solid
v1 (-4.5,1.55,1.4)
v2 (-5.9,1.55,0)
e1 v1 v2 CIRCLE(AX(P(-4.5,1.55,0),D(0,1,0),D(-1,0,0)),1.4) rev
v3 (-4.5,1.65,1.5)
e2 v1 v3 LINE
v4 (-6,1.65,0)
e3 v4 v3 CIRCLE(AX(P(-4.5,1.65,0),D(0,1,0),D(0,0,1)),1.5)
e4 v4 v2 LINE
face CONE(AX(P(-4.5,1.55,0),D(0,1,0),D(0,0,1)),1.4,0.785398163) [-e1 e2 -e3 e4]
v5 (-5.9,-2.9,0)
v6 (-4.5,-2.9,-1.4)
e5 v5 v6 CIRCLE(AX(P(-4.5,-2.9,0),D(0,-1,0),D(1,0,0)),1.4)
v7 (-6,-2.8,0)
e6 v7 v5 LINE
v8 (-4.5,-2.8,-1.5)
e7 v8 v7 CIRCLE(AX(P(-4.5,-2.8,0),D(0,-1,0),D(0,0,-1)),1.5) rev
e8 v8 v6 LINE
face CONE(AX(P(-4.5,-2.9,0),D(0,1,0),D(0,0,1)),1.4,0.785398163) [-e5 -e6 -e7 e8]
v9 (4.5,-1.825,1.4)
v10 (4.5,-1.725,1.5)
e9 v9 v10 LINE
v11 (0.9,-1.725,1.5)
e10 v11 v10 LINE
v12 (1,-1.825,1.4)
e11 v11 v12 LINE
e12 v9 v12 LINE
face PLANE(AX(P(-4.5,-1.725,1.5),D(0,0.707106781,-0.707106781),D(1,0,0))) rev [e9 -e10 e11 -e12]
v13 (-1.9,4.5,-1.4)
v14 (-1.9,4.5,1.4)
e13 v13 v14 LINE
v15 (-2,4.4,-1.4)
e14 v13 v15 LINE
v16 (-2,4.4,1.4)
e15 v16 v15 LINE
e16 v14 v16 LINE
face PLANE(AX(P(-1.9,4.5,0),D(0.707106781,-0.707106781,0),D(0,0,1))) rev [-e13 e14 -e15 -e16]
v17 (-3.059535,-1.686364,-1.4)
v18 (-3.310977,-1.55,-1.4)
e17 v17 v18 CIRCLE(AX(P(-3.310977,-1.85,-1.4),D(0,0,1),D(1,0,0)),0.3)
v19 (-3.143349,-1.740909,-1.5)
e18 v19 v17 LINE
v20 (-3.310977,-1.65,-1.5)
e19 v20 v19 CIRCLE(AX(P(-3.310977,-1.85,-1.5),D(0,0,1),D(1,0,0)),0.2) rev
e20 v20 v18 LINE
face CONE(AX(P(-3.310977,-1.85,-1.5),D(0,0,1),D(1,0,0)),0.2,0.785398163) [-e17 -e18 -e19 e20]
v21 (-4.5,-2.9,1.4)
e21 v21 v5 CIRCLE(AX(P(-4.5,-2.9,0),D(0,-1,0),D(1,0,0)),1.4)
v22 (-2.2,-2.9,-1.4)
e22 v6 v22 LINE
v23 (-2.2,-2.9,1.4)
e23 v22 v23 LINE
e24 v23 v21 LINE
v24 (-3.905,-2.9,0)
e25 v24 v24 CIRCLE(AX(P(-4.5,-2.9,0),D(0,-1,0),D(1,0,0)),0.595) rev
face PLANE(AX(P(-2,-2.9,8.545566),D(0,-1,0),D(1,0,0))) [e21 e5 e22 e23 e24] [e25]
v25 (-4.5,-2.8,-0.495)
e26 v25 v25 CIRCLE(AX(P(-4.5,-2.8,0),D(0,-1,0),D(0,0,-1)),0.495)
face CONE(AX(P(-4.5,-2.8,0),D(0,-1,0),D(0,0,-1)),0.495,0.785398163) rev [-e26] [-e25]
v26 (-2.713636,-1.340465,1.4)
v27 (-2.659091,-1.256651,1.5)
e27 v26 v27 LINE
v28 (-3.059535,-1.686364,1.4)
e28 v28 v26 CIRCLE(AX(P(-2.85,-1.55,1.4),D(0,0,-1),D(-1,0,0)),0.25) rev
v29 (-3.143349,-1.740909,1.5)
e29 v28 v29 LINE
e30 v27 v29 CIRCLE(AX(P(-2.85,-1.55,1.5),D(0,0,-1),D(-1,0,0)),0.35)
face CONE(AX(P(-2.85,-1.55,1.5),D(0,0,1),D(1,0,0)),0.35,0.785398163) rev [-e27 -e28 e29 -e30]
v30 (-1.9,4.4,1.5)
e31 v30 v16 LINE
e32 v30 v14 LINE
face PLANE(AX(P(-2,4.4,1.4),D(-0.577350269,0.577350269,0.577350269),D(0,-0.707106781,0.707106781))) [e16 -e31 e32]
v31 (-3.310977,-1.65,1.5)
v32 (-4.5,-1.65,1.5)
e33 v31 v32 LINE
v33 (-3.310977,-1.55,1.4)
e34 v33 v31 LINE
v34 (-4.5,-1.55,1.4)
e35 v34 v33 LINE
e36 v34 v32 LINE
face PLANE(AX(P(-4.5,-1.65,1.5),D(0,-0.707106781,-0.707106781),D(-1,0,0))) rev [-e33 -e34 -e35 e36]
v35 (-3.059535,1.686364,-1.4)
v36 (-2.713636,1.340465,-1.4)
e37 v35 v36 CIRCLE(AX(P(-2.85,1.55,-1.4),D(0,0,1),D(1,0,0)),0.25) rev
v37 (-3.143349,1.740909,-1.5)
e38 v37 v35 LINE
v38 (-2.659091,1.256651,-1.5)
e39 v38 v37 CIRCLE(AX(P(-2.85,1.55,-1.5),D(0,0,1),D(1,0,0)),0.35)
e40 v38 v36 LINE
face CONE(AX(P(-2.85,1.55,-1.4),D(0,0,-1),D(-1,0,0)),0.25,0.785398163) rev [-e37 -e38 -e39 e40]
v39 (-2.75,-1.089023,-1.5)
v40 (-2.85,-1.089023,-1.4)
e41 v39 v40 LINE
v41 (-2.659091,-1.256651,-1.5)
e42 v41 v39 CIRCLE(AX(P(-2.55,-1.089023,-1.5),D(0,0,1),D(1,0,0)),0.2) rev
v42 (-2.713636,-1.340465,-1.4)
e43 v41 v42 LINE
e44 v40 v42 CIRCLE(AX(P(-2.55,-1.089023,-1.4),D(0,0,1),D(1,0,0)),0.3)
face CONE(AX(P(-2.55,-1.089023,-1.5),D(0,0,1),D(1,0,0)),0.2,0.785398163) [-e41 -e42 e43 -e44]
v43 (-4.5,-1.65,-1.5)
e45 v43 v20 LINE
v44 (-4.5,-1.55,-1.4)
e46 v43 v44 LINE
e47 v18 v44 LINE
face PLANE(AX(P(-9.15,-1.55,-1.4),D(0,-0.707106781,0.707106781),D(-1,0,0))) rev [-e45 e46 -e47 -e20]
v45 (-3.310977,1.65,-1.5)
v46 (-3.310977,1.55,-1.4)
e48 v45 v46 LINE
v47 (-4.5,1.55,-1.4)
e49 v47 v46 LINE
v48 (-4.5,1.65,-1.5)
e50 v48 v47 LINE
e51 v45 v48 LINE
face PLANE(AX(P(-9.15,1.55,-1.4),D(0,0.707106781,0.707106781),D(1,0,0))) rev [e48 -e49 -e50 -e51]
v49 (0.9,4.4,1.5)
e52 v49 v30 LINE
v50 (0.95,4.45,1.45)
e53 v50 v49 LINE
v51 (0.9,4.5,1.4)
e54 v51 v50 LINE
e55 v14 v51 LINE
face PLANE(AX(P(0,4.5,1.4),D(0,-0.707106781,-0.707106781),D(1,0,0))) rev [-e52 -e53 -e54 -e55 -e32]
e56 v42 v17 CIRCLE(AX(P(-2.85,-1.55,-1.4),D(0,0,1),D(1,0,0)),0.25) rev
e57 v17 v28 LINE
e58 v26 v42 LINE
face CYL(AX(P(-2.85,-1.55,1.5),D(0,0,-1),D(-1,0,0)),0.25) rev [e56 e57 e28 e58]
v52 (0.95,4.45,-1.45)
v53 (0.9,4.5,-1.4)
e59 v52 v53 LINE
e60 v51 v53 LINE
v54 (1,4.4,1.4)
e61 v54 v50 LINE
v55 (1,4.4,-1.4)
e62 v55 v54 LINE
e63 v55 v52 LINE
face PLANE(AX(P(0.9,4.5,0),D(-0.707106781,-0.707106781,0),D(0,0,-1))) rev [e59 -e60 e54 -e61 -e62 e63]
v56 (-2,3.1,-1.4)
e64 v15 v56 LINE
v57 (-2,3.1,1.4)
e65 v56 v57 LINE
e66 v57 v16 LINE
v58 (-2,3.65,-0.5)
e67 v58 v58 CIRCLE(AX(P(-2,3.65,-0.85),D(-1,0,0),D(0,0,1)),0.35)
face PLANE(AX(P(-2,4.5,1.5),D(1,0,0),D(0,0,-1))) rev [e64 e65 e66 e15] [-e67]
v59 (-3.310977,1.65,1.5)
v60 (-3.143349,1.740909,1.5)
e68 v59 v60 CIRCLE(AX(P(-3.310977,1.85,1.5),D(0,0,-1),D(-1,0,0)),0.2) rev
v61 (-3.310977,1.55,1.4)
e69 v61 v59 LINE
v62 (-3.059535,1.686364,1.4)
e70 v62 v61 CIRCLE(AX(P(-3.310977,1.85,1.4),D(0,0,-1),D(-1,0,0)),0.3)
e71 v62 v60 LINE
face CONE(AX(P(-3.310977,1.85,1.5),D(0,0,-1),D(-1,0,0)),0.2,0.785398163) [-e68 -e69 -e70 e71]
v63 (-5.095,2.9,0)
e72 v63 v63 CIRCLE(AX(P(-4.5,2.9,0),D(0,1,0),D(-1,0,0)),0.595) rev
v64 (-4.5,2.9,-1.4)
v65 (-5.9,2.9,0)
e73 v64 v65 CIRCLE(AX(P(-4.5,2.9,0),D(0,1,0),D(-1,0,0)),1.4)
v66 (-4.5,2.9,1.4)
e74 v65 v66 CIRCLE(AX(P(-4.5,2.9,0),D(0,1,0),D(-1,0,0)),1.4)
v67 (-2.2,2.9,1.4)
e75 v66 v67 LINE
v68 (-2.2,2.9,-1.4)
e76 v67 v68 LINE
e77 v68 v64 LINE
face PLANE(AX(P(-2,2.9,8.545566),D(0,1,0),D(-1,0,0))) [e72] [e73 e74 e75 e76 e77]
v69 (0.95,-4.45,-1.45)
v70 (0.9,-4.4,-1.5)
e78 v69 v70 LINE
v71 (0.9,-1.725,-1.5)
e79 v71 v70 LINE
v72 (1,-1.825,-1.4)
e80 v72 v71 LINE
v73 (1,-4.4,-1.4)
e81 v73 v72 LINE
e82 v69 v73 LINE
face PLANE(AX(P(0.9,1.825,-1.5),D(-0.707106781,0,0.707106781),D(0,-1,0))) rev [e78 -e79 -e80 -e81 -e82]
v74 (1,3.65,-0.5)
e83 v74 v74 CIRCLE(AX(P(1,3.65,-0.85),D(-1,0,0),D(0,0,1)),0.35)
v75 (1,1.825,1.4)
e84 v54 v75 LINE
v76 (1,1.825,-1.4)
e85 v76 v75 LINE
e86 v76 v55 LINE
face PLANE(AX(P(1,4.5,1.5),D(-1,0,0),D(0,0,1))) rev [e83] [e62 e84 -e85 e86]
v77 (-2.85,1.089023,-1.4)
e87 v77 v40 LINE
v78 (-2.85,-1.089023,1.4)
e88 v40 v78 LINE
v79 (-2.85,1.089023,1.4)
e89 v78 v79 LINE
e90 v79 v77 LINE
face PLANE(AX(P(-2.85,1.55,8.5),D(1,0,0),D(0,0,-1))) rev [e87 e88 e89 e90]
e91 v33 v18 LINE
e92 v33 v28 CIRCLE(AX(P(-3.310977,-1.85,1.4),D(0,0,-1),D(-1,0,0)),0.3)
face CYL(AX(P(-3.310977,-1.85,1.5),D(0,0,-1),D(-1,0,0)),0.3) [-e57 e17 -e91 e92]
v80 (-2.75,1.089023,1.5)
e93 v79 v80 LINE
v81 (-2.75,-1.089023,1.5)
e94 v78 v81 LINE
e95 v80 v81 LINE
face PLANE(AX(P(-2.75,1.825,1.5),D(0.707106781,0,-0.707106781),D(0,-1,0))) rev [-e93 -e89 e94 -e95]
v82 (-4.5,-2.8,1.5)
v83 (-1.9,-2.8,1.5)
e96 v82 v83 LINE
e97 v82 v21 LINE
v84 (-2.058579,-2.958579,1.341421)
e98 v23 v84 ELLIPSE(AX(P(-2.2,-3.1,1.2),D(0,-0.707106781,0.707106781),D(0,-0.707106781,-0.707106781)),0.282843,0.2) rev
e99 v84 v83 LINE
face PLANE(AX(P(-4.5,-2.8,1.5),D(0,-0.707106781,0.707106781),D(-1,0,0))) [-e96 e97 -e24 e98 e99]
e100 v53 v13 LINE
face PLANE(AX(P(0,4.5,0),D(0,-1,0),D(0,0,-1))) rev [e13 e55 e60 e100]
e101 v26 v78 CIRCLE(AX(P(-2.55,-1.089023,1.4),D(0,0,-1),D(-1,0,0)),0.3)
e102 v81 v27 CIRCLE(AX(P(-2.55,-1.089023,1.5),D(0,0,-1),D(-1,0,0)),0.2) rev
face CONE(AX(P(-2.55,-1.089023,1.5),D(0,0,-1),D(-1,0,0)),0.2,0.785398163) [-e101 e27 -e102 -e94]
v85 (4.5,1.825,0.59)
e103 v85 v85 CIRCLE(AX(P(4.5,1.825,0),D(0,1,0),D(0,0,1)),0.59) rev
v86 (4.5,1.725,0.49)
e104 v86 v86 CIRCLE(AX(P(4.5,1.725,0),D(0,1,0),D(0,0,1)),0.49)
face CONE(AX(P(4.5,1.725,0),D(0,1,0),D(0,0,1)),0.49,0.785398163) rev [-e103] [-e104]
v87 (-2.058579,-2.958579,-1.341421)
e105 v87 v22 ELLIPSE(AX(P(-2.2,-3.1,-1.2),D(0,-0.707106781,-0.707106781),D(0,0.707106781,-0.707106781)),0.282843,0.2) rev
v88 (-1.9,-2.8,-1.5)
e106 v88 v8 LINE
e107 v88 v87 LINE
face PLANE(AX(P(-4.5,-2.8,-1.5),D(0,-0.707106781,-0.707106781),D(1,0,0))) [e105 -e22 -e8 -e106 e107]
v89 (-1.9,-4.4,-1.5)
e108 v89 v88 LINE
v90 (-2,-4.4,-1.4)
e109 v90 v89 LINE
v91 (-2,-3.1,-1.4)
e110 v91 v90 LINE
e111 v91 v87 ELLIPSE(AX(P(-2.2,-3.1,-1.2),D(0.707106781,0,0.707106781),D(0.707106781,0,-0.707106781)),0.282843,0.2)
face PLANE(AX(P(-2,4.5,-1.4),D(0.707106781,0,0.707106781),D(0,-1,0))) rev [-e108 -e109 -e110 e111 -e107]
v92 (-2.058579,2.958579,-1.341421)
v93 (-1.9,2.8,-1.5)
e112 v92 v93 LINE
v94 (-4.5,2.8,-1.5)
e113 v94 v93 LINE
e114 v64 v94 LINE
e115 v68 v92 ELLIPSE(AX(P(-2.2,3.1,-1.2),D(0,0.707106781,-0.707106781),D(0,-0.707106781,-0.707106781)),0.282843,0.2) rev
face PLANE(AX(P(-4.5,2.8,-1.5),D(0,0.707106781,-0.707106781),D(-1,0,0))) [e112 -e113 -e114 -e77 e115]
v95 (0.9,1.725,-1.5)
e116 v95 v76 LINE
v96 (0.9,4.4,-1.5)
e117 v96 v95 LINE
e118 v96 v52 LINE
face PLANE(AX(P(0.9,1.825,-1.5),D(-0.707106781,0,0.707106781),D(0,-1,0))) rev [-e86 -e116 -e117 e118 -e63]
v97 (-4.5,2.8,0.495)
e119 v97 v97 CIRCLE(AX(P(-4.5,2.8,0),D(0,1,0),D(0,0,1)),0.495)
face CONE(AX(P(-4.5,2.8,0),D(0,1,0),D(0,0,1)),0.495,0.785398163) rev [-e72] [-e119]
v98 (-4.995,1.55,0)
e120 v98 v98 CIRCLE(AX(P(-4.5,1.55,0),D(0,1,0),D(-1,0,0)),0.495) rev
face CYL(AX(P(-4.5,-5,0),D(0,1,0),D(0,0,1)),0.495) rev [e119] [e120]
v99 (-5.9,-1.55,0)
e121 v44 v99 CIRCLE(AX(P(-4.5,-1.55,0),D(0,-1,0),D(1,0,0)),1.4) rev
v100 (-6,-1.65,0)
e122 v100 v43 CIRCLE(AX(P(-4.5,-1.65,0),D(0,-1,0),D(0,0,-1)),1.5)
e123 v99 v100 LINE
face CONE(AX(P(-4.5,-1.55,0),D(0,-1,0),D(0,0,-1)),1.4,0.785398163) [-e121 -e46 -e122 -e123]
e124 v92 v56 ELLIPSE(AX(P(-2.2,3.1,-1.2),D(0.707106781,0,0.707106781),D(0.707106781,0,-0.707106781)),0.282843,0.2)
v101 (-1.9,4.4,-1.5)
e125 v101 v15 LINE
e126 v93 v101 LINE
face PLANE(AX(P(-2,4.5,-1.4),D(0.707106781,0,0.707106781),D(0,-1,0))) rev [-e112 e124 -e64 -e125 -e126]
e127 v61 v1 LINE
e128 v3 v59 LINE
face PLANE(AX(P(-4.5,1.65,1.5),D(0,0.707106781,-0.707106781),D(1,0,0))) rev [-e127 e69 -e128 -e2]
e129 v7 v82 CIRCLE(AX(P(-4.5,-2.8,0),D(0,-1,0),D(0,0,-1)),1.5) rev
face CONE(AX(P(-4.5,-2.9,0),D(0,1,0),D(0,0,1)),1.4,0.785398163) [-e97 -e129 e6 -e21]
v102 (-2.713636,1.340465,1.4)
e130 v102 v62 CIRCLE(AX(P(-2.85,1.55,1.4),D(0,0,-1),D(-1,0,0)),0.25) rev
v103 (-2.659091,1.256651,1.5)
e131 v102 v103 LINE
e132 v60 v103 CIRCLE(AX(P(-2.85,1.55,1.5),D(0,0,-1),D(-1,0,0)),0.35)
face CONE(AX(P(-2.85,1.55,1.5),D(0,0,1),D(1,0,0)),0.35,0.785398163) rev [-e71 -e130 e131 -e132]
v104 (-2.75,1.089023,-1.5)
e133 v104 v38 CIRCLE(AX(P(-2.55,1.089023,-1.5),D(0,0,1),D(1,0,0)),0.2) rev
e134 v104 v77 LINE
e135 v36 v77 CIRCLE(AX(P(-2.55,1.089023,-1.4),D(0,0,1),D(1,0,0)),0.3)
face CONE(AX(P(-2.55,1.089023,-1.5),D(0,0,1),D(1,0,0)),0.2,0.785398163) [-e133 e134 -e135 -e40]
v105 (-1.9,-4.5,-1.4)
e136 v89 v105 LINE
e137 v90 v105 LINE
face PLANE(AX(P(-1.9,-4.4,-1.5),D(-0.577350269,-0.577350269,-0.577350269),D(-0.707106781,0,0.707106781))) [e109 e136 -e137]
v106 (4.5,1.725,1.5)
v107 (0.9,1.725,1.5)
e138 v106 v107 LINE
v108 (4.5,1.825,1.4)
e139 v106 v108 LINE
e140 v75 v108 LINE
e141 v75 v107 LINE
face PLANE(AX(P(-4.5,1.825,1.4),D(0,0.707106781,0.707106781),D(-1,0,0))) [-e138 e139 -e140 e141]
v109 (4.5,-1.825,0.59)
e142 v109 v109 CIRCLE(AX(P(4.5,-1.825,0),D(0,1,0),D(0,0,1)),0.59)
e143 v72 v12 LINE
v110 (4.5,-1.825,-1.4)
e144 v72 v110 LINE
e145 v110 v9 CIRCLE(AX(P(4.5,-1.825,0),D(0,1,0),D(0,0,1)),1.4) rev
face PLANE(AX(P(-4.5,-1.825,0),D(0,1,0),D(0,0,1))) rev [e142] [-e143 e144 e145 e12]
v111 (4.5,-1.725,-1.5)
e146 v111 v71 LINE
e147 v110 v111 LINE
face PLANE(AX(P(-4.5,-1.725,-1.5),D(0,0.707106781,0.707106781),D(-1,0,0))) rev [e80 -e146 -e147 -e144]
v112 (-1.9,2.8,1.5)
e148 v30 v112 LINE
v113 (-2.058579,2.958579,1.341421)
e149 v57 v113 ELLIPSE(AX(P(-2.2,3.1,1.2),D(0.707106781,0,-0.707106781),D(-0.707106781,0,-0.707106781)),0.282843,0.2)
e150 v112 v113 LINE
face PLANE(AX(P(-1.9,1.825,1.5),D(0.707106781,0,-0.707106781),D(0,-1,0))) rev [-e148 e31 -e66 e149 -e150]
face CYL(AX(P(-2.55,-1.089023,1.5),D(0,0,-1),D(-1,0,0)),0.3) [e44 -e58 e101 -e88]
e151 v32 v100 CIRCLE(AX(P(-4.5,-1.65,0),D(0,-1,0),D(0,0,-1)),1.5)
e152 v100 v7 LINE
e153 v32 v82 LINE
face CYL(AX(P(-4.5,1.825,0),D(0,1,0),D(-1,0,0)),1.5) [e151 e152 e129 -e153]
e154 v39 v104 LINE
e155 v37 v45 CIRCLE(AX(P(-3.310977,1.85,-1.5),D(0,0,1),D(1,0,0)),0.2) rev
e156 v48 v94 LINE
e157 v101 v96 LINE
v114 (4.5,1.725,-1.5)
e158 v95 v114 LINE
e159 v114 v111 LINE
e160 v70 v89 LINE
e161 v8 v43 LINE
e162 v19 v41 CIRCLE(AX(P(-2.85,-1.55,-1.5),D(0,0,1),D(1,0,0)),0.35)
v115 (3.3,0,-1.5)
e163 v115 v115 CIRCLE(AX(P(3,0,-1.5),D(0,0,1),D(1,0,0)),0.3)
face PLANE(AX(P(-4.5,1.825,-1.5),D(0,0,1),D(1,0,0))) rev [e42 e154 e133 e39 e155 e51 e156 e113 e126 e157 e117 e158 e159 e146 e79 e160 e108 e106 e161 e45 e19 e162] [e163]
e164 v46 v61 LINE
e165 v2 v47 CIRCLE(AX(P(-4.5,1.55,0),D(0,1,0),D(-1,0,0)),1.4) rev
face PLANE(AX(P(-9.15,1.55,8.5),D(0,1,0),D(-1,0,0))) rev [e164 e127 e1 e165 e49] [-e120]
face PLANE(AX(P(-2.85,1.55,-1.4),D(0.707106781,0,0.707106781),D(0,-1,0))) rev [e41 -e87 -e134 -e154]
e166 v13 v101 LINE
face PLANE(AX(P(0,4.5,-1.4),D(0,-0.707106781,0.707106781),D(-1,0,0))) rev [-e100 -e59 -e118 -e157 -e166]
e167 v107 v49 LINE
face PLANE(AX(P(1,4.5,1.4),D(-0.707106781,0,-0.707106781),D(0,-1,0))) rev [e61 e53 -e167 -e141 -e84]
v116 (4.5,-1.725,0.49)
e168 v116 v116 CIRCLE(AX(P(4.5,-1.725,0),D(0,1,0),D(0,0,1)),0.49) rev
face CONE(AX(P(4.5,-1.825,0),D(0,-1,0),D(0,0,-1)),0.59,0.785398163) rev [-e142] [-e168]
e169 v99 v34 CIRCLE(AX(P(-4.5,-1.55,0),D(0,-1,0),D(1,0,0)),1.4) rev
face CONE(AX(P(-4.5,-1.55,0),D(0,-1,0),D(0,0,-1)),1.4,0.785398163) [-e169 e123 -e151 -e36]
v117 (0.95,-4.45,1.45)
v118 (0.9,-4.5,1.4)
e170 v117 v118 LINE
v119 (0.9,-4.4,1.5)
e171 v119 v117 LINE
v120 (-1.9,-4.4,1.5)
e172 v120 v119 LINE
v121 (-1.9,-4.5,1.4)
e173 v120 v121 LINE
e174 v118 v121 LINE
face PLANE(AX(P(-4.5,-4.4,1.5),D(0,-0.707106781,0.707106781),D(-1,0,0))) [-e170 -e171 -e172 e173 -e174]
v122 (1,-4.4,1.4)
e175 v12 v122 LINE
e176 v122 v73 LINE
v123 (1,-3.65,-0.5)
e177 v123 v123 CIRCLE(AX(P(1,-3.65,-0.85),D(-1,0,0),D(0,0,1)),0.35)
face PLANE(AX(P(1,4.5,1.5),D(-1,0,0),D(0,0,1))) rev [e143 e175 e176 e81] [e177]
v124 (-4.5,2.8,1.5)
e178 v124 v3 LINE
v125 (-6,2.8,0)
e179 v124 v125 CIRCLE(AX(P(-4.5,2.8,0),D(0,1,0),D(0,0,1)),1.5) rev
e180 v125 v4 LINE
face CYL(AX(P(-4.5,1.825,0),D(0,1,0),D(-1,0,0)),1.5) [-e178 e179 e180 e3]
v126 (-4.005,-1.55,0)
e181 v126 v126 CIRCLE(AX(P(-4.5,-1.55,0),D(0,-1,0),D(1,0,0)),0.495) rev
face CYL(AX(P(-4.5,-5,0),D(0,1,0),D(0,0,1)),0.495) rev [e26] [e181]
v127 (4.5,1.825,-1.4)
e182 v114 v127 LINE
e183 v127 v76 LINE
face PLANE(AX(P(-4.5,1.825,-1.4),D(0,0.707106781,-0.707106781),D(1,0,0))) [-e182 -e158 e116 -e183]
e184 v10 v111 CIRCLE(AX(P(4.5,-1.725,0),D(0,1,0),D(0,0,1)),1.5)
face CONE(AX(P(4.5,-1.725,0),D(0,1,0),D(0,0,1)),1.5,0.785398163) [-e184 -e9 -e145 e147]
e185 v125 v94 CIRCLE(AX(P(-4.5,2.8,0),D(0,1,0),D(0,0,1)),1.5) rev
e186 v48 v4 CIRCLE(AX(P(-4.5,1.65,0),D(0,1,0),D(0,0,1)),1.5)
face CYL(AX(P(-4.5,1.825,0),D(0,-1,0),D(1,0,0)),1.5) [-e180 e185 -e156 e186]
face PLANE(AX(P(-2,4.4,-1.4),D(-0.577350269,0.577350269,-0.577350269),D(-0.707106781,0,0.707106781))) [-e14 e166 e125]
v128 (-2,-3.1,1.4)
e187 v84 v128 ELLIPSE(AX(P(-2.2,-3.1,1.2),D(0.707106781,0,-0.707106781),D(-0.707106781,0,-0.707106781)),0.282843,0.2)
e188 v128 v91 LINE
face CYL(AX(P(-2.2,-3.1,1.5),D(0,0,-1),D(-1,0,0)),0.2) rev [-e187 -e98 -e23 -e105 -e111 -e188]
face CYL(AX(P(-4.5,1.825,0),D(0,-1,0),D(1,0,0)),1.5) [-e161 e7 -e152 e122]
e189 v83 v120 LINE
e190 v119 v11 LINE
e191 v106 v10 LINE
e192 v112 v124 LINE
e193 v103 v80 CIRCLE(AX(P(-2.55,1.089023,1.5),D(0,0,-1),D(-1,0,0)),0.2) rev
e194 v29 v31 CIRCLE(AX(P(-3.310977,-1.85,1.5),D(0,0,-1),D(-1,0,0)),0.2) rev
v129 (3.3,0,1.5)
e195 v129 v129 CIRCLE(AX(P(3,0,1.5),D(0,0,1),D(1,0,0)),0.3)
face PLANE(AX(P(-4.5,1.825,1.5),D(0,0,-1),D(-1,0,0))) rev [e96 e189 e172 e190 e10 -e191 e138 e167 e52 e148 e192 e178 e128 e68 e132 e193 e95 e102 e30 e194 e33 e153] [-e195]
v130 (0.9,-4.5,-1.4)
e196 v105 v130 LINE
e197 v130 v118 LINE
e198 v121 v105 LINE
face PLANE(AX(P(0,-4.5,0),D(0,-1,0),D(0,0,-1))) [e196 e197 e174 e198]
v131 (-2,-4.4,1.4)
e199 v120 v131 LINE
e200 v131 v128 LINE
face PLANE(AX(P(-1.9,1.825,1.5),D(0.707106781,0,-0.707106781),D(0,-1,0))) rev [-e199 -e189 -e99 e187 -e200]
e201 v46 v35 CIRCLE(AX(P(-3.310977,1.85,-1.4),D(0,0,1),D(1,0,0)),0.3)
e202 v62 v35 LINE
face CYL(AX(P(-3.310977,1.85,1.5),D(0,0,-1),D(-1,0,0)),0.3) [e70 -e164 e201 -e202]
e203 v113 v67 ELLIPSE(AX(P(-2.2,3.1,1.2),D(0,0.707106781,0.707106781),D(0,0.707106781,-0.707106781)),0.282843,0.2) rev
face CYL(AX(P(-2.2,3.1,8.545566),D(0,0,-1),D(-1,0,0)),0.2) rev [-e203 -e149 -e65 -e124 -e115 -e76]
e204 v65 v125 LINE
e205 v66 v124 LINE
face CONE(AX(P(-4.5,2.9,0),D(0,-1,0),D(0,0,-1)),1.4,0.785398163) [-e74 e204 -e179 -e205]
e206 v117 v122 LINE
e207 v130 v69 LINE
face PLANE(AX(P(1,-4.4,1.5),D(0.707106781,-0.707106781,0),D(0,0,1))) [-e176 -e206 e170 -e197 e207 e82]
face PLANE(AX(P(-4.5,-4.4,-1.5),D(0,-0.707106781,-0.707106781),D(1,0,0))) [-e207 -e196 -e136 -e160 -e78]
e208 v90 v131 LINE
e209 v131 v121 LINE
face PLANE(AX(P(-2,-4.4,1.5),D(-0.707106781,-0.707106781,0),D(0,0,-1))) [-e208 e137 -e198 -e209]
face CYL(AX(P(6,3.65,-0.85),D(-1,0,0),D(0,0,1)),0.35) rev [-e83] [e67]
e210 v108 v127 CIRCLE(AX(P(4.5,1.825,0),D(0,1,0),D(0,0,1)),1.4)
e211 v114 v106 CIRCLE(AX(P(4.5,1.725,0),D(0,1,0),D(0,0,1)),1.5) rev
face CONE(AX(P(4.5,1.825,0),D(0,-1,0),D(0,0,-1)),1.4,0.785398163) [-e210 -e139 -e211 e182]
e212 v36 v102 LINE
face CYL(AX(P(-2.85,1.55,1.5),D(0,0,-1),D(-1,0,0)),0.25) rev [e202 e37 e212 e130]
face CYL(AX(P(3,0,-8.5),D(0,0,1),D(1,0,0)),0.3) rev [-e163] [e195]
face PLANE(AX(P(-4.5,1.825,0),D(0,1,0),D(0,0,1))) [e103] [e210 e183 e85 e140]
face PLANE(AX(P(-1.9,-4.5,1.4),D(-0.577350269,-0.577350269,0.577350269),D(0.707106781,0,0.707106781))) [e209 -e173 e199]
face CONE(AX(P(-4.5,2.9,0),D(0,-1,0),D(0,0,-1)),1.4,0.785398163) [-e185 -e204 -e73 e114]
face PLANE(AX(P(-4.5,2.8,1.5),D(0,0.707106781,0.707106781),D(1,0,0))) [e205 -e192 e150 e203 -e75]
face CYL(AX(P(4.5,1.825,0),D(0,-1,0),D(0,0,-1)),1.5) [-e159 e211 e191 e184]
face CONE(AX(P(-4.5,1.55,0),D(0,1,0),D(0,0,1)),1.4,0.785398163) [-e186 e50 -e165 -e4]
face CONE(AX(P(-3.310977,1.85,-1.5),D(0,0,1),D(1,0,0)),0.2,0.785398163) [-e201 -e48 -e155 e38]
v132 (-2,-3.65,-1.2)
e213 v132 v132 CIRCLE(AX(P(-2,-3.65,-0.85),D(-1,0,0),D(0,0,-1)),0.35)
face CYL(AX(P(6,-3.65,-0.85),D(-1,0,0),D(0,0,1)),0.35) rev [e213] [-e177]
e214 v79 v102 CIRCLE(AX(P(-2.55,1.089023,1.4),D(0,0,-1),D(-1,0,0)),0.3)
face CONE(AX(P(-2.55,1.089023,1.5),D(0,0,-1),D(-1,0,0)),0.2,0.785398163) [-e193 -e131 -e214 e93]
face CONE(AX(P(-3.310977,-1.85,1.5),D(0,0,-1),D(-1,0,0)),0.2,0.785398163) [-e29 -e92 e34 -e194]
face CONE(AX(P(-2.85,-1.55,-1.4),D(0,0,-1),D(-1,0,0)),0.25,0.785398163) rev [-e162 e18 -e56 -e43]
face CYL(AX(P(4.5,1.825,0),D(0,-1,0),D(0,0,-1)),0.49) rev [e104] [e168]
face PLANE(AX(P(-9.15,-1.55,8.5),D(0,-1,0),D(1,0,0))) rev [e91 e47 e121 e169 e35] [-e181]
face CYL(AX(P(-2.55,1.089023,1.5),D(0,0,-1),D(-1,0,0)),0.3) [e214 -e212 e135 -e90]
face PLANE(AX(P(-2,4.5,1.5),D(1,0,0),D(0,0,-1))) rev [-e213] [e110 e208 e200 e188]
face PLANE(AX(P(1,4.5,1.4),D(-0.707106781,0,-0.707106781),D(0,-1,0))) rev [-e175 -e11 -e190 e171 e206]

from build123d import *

# Parameters (mm, degrees)
SKETCH1_R           = 0.495
SKETCH1_R_2         = 0.49
BOSS_EXTRUDE1_DEPTH = 1.825
SKETCH3_W           = 3
SKETCH3_H           = 3
BOSS_EXTRUDE4_DEPTH = 4.5
SKETCH6_W           = 4
SKETCH6_H           = 5.8
BOSS_EXTRUDE5_DEPTH = 3
SKETCH8_R           = 0.495
CUT_EXTRUDE4_DEPTH  = 5
SKETCH7_W           = 6.3
SKETCH7_H           = 3.1
CUT_EXTRUDE3_DEPTH  = 10
SKETCH9_R           = 0.25
CUT_EXTRUDE5_DEPTH  = 9.077747211
SKETCH4_R           = 0.35
CUT_EXTRUDE1_DEPTH  = 10.300537619
SKETCH5_R           = 0.3
CUT_EXTRUDE2_DEPTH  = 10
FILLET3_R           = 0.3
FILLET4_R           = 1.5
CHAMFER1_SIZE       = 0.1
CHAMFER2_SIZE       = 0.1
CHAMFER3_SIZE       = 0.1
CHAMFER4_SIZE       = 0.1
FILLET5_R           = 0.2


# Some blends are built 0.0001 mm under size
with BuildPart() as part:
    # Sketch1 → Boss-Extrude1 (new, symmetric)
    with BuildSketch(Plane(origin=(0, 0, 0), x_dir=(1, 0, 0), z_dir=(0, 1, 0))):
        with BuildLine():
            Line((-4.5, 1.5), (4.5, 1.5))
            ThreePointArc((4.5, 1.5), (6, 0), (4.5, -1.5))
            Line((4.5, -1.5), (-4.5, -1.5))
            ThreePointArc((-4.5, -1.5), (-6, 0), (-4.5, 1.5))
        make_face()
        with Locations(Location((-4.5, 0, 0), (0, 0, 270))):
            Circle(SKETCH1_R, mode=Mode.SUBTRACT)
        with Locations(Location((4.5, 0, 0), (0, 0, 270))):
            Circle(SKETCH1_R_2, mode=Mode.SUBTRACT)
    extrude(amount=BOSS_EXTRUDE1_DEPTH, both=True)

    # Sketch3 → Boss-Extrude4 (add, symmetric)
    with BuildSketch(Plane(origin=(0, 0, 0), x_dir=(1, 0, 0), z_dir=(0, 1, 0))):
        with Locations((-0.5, 0)):
            Rectangle(SKETCH3_W, SKETCH3_H)
    extrude(amount=BOSS_EXTRUDE4_DEPTH, both=True)

    # Sketch6 → Boss-Extrude5 (add)
    with BuildSketch(Plane(origin=(0, 0, -1.5), x_dir=(-1, 0, 0), z_dir=(0, 0, -1))):
        with Locations((4, 0)):
            Rectangle(SKETCH6_W, SKETCH6_H)
    extrude(amount=-BOSS_EXTRUDE5_DEPTH)

    # Sketch8 → Cut-Extrude4 (cut, symmetric)
    with BuildSketch(Plane(origin=(0, 0, 0), x_dir=(1, 0, 0), z_dir=(0, 1, 0))):
        with Locations((-4.5, 0)):
            Circle(SKETCH8_R)
    extrude(amount=CUT_EXTRUDE4_DEPTH, both=True, mode=Mode.SUBTRACT)

    # Sketch7 → Cut-Extrude3 (cut)
    with BuildSketch(Plane(origin=(0, 0, -1.5), x_dir=(-1, 0, 0), z_dir=(0, 0, -1))):
        with Locations((6, 0)):
            Rectangle(SKETCH7_W, SKETCH7_H)
    extrude(amount=-CUT_EXTRUDE3_DEPTH, mode=Mode.SUBTRACT)

    # Sketch9 → Cut-Extrude5 (cut, through all)
    with BuildSketch(Plane(origin=(0, 0, -1.5), x_dir=(-1, 0, 0), z_dir=(0, 0, -1))):
        with Locations((2.85, 1.55)):
            Circle(SKETCH9_R)
        with Locations((2.85, -1.55)):
            Circle(SKETCH9_R)
    extrude(amount=-CUT_EXTRUDE5_DEPTH, mode=Mode.SUBTRACT)

    # Sketch4 → Cut-Extrude1 (cut, through all)
    with BuildSketch(Plane.ZY.offset(2)):
        with Locations((-0.85, 3.65)):
            Circle(SKETCH4_R)
        with Locations((-0.85, -3.65)):
            Circle(SKETCH4_R)
    extrude(amount=-CUT_EXTRUDE1_DEPTH, mode=Mode.SUBTRACT)

    # Sketch5 → Cut-Extrude2 (cut)
    with BuildSketch(Plane.XY.offset(1.5)):
        with Locations((3, 0)):
            Circle(SKETCH5_R)
    extrude(amount=-CUT_EXTRUDE2_DEPTH, mode=Mode.SUBTRACT)

    # Fillet3
    fillet3_edges = [part.edges().sort_by_distance(p)[0] for p in [
        (-3.1, 1.55, 0),
        (-2.85, 1.3, 0),
        (-3.1, -1.55, 0),
        (-2.85, -1.3, 0),
    ]]
    fillet(fillet3_edges, radius=FILLET3_R)

    # Fillet4
    fillet4_edges = [part.edges().sort_by_distance(p)[0] for p in [
        (-6, 2.225, 1.5),
        (-6, 2.225, -1.5),
        (-6, -2.225, 1.5),
        (-6, -2.225, -1.5),
    ]]
    fillet(fillet4_edges, radius=FILLET4_R - 0.0001)  # a hair under: the kernel refuses the full size

    # Chamfer1
    chamfer1_edges = [part.edges().sort_by_distance(p)[0] for p in [
        (4.5, -1.825, -0.49),
        (4.5, 1.825, -0.49),
        (-4.995, -2.9, 0),
        (-4.995, 2.9, 0),
    ]]
    chamfer(chamfer1_edges, length=CHAMFER1_SIZE)

    # Chamfer2
    chamfer2_edges = [part.edges().sort_by_distance(p)[0] for p in [
        (6, 1.825, 0),
        (2.75, 1.825, -1.5),
        (2.75, -1.825, 1.5),
        (2.75, 1.825, 1.5),
        (1, -3.1625, -1.5),
        (1, -3.1625, 1.5),
        (1, -4.5, 0),
        (1, 3.1625, 1.5),
        (1, 3.1625, -1.5),
        (1, 4.5, 0),
        (2.75, -1.825, -1.5),
        (6, -1.825, 0),
    ]]
    chamfer(chamfer2_edges, length=CHAMFER2_SIZE)

    # Chamfer3
    # the kernel refuses this chamfer: 0.1 mm, written as the material it takes off along each edge
    with BuildSketch(Plane(origin=(-4.5001, -1.55, 1.5), x_dir=(0, 0.02749587661058508, -0.9996219169112966), z_dir=(1, 0, 0)), Plane(origin=(-3.310977223, 1.55, 1.5), x_dir=(0, -0.027495876610587243, -0.9996219169112966), z_dir=(-1, 0, 0))) as chamfer3_piece_1:
        Polygon((CHAMFER3_SIZE * 0.999621916911, -CHAMFER3_SIZE * 0.0274958766106), (-CHAMFER3_SIZE * 0.0274958766106, -CHAMFER3_SIZE * 0.999621916911), (0, 0), align=None)
    extrude(amount=1.189122777, mode=Mode.SUBTRACT)
    with BuildSketch(Plane(origin=(-3.310977223, -1.55, -1.5), x_dir=(0, -0.9996219169112966, -0.027495876610587302), z_dir=(-1, 0, 0)), Plane(origin=(-4.5001, 1.55, -1.5), x_dir=(0, 0.9996219169112966, -0.027495876610587302), z_dir=(1, 0, 0))) as chamfer3_piece_2:
        Polygon((CHAMFER3_SIZE * 0.999621916911, CHAMFER3_SIZE * 0.0274958766106), (-CHAMFER3_SIZE * 0.0274958766106, CHAMFER3_SIZE * 0.999621916911), (0, 0), align=None)
    extrude(amount=1.189122777, mode=Mode.SUBTRACT)
    with BuildSketch(Plane(origin=(-2.85, -1.55, -1.5), x_dir=(0.545454545454545, 0.8381404052084447, 0), z_dir=(-0.8381404052084447, 0.545454545454545, 0))) as chamfer3_piece_3:
        Polygon((0.25 + CHAMFER3_SIZE, 0), (0.25, -CHAMFER3_SIZE), (0.25, 0), align=None)
    revolve(axis=Axis((-2.85, -1.55, -1.5), (0, 0, -1)), revolution_arc=203.888537698, mode=Mode.SUBTRACT)
    with BuildSketch(Plane(origin=(-2.85, 1.089022777, -1.5), x_dir=(0.9996219169112966, 0, -0.02749587661058718), z_dir=(0, -1, 0))) as chamfer3_piece_4:
        Polygon((CHAMFER3_SIZE * 0.999621916911, CHAMFER3_SIZE * 0.0274958766106), (-CHAMFER3_SIZE * 0.0274958766106, CHAMFER3_SIZE * 0.999621916911), (0, 0), align=None)
    extrude(amount=2.178045554, mode=Mode.SUBTRACT)
    with BuildSketch(Plane(origin=(-2.85, 1.55, -1.5), x_dir=(-0.8381404052084445, 0.5454545454545454, 0), z_dir=(-0.5454545454545454, -0.8381404052084445, 0))) as chamfer3_piece_5:
        Polygon((0.25 + CHAMFER3_SIZE, 0), (0.25, -CHAMFER3_SIZE), (0.25, 0), align=None)
    revolve(axis=Axis((-2.85, 1.55, -1.5), (0, 0, -1)), revolution_arc=203.888537698, mode=Mode.SUBTRACT)
    with BuildSketch(Plane(origin=(-2.55, 1.089022777, -1.5), x_dir=(-0.5454545454545466, 0.8381404052084436, 0), z_dir=(0.8381404052084436, 0.5454545454545466, 0))) as chamfer3_piece_6:
        Polygon((0.3 - CHAMFER3_SIZE, 0), (0.3, CHAMFER3_SIZE), (0.3, 0), align=None)
    revolve(axis=Axis((-2.55, 1.089022777, -1.5), (0, 0, 1)), revolution_arc=56.944268849, mode=Mode.SUBTRACT)
    with BuildSketch(Plane(origin=(-3.310977223, 1.85, -1.5), x_dir=(0, -1, 0), z_dir=(-1, 0, 0))) as chamfer3_piece_7:
        Polygon((0.3 - CHAMFER3_SIZE, 0), (0.3, CHAMFER3_SIZE), (0.3, 0), align=None)
    revolve(axis=Axis((-3.310977223, 1.85, -1.5), (0, 0, 1)), revolution_arc=56.944268849, mode=Mode.SUBTRACT)
    with BuildSketch(Plane(origin=(-2.55, -1.089022777, -1.5), x_dir=(-1, 0, 0), z_dir=(0, 1, 0))) as chamfer3_piece_8:
        Polygon((0.3 - CHAMFER3_SIZE, 0), (0.3, CHAMFER3_SIZE), (0.3, 0), align=None)
    revolve(axis=Axis((-2.55, -1.089022777, -1.5), (0, 0, 1)), revolution_arc=56.944268849, mode=Mode.SUBTRACT)
    with BuildSketch(Plane(origin=(-3.310977223, -1.85, -1.5), x_dir=(0.8381404052084445, 0.5454545454545453, 0), z_dir=(0.5454545454545453, -0.8381404052084445, 0))) as chamfer3_piece_9:
        Polygon((0.3 - CHAMFER3_SIZE, 0), (0.3, CHAMFER3_SIZE), (0.3, 0), align=None)
    revolve(axis=Axis((-3.310977223, -1.85, -1.5), (0, 0, 1)), revolution_arc=56.944268849, mode=Mode.SUBTRACT)
    with BuildSketch(Plane(origin=(-2.85, -1.55, 1.5), x_dir=(0.545454545454545, 0.8381404052084447, 0), z_dir=(-0.8381404052084447, 0.545454545454545, 0))) as chamfer3_piece_10:
        Polygon((0.25, CHAMFER3_SIZE), (0.25 + CHAMFER3_SIZE, 0), (0.25, 0), align=None)
    revolve(axis=Axis((-2.85, -1.55, 1.5), (0, 0, -1)), revolution_arc=203.888537698, mode=Mode.SUBTRACT)
    with BuildSketch(Plane(origin=(-2.85, -1.089022777, 1.5), x_dir=(-0.027495876610587302, 0, -0.9996219169112966), z_dir=(0, 1, 0))) as chamfer3_piece_11:
        Polygon((CHAMFER3_SIZE * 0.999621916911, -CHAMFER3_SIZE * 0.0274958766106), (-CHAMFER3_SIZE * 0.0274958766106, -CHAMFER3_SIZE * 0.999621916911), (0, 0), align=None)
    extrude(amount=2.178045554, mode=Mode.SUBTRACT)
    with BuildSketch(Plane(origin=(-2.85, 1.55, 1.5), x_dir=(-0.8381404052084445, 0.5454545454545454, 0), z_dir=(-0.5454545454545454, -0.8381404052084445, 0))) as chamfer3_piece_12:
        Polygon((0.25, CHAMFER3_SIZE), (0.25 + CHAMFER3_SIZE, 0), (0.25, 0), align=None)
    revolve(axis=Axis((-2.85, 1.55, 1.5), (0, 0, -1)), revolution_arc=203.888537698, mode=Mode.SUBTRACT)
    with BuildSketch(Plane(origin=(-2.55, 1.089022777, 1.5), x_dir=(-0.5454545454545453, 0.8381404052084445, 0), z_dir=(0.8381404052084445, 0.5454545454545453, 0))) as chamfer3_piece_13:
        Polygon((0.3, -CHAMFER3_SIZE), (0.3 - CHAMFER3_SIZE, 0), (0.3, 0), align=None)
    revolve(axis=Axis((-2.55, 1.089022777, 1.5), (0, 0, 1)), revolution_arc=56.944268849, mode=Mode.SUBTRACT)
    with BuildSketch(Plane(origin=(-3.310977223, 1.85, 1.5), x_dir=(0, -1, 0), z_dir=(-1, 0, 0))) as chamfer3_piece_14:
        Polygon((0.3, -CHAMFER3_SIZE), (0.3 - CHAMFER3_SIZE, 0), (0.3, 0), align=None)
    revolve(axis=Axis((-3.310977223, 1.85, 1.5), (0, 0, 1)), revolution_arc=56.944268849, mode=Mode.SUBTRACT)
    with BuildSketch(Plane(origin=(-2.55, -1.089022777, 1.5), x_dir=(-1, 0, 0), z_dir=(0, 1, 0))) as chamfer3_piece_15:
        Polygon((0.3, -CHAMFER3_SIZE), (0.3 - CHAMFER3_SIZE, 0), (0.3, 0), align=None)
    revolve(axis=Axis((-2.55, -1.089022777, 1.5), (0, 0, 1)), revolution_arc=56.944268849, mode=Mode.SUBTRACT)
    with BuildSketch(Plane(origin=(-3.310977223, -1.85, 1.5), x_dir=(0.8381404052084445, 0.5454545454545453, 0), z_dir=(0.5454545454545453, -0.8381404052084445, 0))) as chamfer3_piece_16:
        Polygon((0.3, -CHAMFER3_SIZE), (0.3 - CHAMFER3_SIZE, 0), (0.3, 0), align=None)
    revolve(axis=Axis((-3.310977223, -1.85, 1.5), (0, 0, 1)), revolution_arc=56.944268849, mode=Mode.SUBTRACT)
    with BuildSketch(Plane(origin=(-4.5001, -2.9, 1.5), x_dir=(0, -0.027495876610587243, -0.9996219169112966), z_dir=(1, 0, 0)), Plane(origin=(-2, 2.9, -1.5), x_dir=(0, -0.9996219169112966, -0.027495876610587302), z_dir=(-1, 0, 0)), Plane(origin=(-4.5001, -2.9, -1.5), x_dir=(0, 0.9996219169112966, -0.027495876610587302), z_dir=(1, 0, 0)), Plane(origin=(-2, 2.9, 1.5), x_dir=(0, 0.027495876610587302, -0.9996219169112966), z_dir=(-1, 0, 0))) as chamfer3_piece_17:
        Polygon((CHAMFER3_SIZE * 0.999621916911, CHAMFER3_SIZE * 0.0274958766106), (-CHAMFER3_SIZE * 0.0274958766106, CHAMFER3_SIZE * 0.999621916911), (0, 0), align=None)
    extrude(amount=2.5001, mode=Mode.SUBTRACT)
    with BuildSketch(Plane(origin=(-4.5001, 1.55, -0.0001), x_dir=(0, 0, -1), z_dir=(1, 0, 0))) as chamfer3_piece_18:
        Polygon((1.4999, CHAMFER3_SIZE), (1.4999 - CHAMFER3_SIZE, 0), (1.4999, 0), align=None)
    revolve(axis=Axis((-4.5001, 1.55, -0.0001), (0, 1, 0)), revolution_arc=90, mode=Mode.SUBTRACT)
    with BuildSketch(Plane(origin=(-4.5001, 1.55, 0.0001), x_dir=(-1, 0, 0), z_dir=(0, 0, -1))) as chamfer3_piece_19:
        Polygon((1.4999 - CHAMFER3_SIZE, 0), (1.4999, CHAMFER3_SIZE), (1.4999, 0), align=None)
    revolve(axis=Axis((-4.5001, 1.55, 0.0001), (0, 1, 0)), revolution_arc=90, mode=Mode.SUBTRACT)
    with BuildSketch(Plane(origin=(-4.5001, 2.9, -0.0001), x_dir=(0, 0, -1), z_dir=(1, 0, 0))) as chamfer3_piece_20:
        Polygon((1.4999 - CHAMFER3_SIZE, 0), (1.4999, -CHAMFER3_SIZE), (1.4999, 0), align=None)
    revolve(axis=Axis((-4.5001, 2.9, -0.0001), (0, 1, 0)), revolution_arc=90, mode=Mode.SUBTRACT)
    with BuildSketch(Plane(origin=(-4.5001, 2.9, 0.0001), x_dir=(-1, 0, 0), z_dir=(0, 0, -1))) as chamfer3_piece_21:
        Polygon((1.4999 - CHAMFER3_SIZE, 0), (1.4999, -CHAMFER3_SIZE), (1.4999, 0), align=None)
    revolve(axis=Axis((-4.5001, 2.9, 0.0001), (0, 1, 0)), revolution_arc=90, mode=Mode.SUBTRACT)
    with BuildSketch(Plane(origin=(-4.5001, -2.9, -0.0001), x_dir=(0, 0, -1), z_dir=(1, 0, 0))) as chamfer3_piece_22:
        Polygon((1.4999 - CHAMFER3_SIZE, 0), (1.4999, CHAMFER3_SIZE), (1.4999, 0), align=None)
    revolve(axis=Axis((-4.5001, -2.9, -0.0001), (0, 1, 0)), revolution_arc=90, mode=Mode.SUBTRACT)
    with BuildSketch(Plane(origin=(-4.5001, -2.9, 0.0001), x_dir=(-1, 0, 0), z_dir=(0, 0, -1))) as chamfer3_piece_23:
        Polygon((1.4999 - CHAMFER3_SIZE, 0), (1.4999, CHAMFER3_SIZE), (1.4999, 0), align=None)
    revolve(axis=Axis((-4.5001, -2.9, 0.0001), (0, 1, 0)), revolution_arc=90, mode=Mode.SUBTRACT)
    with BuildSketch(Plane(origin=(-4.5001, -1.55, -0.0001), x_dir=(0, 0, -1), z_dir=(1, 0, 0))) as chamfer3_piece_24:
        Polygon((1.4999, -CHAMFER3_SIZE), (1.4999 - CHAMFER3_SIZE, 0), (1.4999, 0), align=None)
    revolve(axis=Axis((-4.5001, -1.55, -0.0001), (0, 1, 0)), revolution_arc=90, mode=Mode.SUBTRACT)
    with BuildSketch(Plane(origin=(-4.5001, -1.55, 0.0001), x_dir=(-1, 0, 0), z_dir=(0, 0, -1))) as chamfer3_piece_25:
        Polygon((1.4999 - CHAMFER3_SIZE, 0), (1.4999, -CHAMFER3_SIZE), (1.4999, 0), align=None)
    revolve(axis=Axis((-4.5001, -1.55, 0.0001), (0, 1, 0)), revolution_arc=90, mode=Mode.SUBTRACT)
    with BuildSketch(Plane(origin=(-6, -1.55, 0.0001), x_dir=(0.9996219169112966, 0.02749587661058742, 0), z_dir=(0, 0, -1)), Plane(origin=(-6, -1.55, 0), x_dir=(0.9996219169112966, 0.02749587661058742, 0), z_dir=(0, 0, -1)), Plane(origin=(-6, 1.55, 0), x_dir=(0.9996219169112966, -0.02749587661058742, 0), z_dir=(0, 0, 1)), Plane(origin=(-6, 1.55, -0.0001), x_dir=(0.9996219169112966, -0.02749587661058742, 0), z_dir=(0, 0, 1))) as chamfer3_piece_26:
        Polygon((CHAMFER3_SIZE * 0.999621916911, CHAMFER3_SIZE * 0.0274958766106), (-CHAMFER3_SIZE * 0.0274958766106, CHAMFER3_SIZE * 0.999621916911), (0, 0), align=None)
    extrude(amount=0.0001, mode=Mode.SUBTRACT)
    with BuildSketch(Plane(origin=(-6, -2.9, -0.0001), x_dir=(0.9996219169112966, -0.02749587661058742, 0), z_dir=(0, 0, 1))) as chamfer3_piece_27:
        Polygon((CHAMFER3_SIZE * 0.999621916911, CHAMFER3_SIZE * 0.0274958766106), (-CHAMFER3_SIZE * 0.0274958766106, CHAMFER3_SIZE * 0.999621916911), (0, 0), align=None)
    extrude(amount=0.0002, mode=Mode.SUBTRACT)
    with BuildSketch(Plane(origin=(-6, 2.9, -0.0001), x_dir=(0.9996219169112966, 0.02749587661058742, 0), z_dir=(0, 0, 1))) as chamfer3_piece_28:
        Polygon((CHAMFER3_SIZE * 0.999621916911, -CHAMFER3_SIZE * 0.0274958766106), (-CHAMFER3_SIZE * 0.0274958766106, -CHAMFER3_SIZE * 0.999621916911), (0, 0), align=None)
    extrude(amount=0.0002, mode=Mode.SUBTRACT)

    # Chamfer4
    chamfer4_edges = [part.edges().sort_by_distance(p)[0] for p in [
        (-2, 3.65, 1.5),
        (-0.55, 4.5, 1.5),
        (-2, 4.5, 0),
        (-0.55, 4.5, -1.5),
        (-2, 3.65, -1.5),
        (-0.55, -4.5, 1.5),
        (-0.55, -4.5, -1.5),
        (-2, -3.65, 1.5),
        (-2, -4.5, 0),
        (-2, -3.65, -1.5),
    ]]
    chamfer(chamfer4_edges, length=CHAMFER4_SIZE)

    # Fillet5
    fillet5_edges = [part.edges().sort_by_distance(p)[0] for p in [
        (-2, -2.9, 0),
        (-2, 2.9, 0),
    ]]
    fillet(fillet5_edges, radius=FILLET5_R)


solid = part.part
